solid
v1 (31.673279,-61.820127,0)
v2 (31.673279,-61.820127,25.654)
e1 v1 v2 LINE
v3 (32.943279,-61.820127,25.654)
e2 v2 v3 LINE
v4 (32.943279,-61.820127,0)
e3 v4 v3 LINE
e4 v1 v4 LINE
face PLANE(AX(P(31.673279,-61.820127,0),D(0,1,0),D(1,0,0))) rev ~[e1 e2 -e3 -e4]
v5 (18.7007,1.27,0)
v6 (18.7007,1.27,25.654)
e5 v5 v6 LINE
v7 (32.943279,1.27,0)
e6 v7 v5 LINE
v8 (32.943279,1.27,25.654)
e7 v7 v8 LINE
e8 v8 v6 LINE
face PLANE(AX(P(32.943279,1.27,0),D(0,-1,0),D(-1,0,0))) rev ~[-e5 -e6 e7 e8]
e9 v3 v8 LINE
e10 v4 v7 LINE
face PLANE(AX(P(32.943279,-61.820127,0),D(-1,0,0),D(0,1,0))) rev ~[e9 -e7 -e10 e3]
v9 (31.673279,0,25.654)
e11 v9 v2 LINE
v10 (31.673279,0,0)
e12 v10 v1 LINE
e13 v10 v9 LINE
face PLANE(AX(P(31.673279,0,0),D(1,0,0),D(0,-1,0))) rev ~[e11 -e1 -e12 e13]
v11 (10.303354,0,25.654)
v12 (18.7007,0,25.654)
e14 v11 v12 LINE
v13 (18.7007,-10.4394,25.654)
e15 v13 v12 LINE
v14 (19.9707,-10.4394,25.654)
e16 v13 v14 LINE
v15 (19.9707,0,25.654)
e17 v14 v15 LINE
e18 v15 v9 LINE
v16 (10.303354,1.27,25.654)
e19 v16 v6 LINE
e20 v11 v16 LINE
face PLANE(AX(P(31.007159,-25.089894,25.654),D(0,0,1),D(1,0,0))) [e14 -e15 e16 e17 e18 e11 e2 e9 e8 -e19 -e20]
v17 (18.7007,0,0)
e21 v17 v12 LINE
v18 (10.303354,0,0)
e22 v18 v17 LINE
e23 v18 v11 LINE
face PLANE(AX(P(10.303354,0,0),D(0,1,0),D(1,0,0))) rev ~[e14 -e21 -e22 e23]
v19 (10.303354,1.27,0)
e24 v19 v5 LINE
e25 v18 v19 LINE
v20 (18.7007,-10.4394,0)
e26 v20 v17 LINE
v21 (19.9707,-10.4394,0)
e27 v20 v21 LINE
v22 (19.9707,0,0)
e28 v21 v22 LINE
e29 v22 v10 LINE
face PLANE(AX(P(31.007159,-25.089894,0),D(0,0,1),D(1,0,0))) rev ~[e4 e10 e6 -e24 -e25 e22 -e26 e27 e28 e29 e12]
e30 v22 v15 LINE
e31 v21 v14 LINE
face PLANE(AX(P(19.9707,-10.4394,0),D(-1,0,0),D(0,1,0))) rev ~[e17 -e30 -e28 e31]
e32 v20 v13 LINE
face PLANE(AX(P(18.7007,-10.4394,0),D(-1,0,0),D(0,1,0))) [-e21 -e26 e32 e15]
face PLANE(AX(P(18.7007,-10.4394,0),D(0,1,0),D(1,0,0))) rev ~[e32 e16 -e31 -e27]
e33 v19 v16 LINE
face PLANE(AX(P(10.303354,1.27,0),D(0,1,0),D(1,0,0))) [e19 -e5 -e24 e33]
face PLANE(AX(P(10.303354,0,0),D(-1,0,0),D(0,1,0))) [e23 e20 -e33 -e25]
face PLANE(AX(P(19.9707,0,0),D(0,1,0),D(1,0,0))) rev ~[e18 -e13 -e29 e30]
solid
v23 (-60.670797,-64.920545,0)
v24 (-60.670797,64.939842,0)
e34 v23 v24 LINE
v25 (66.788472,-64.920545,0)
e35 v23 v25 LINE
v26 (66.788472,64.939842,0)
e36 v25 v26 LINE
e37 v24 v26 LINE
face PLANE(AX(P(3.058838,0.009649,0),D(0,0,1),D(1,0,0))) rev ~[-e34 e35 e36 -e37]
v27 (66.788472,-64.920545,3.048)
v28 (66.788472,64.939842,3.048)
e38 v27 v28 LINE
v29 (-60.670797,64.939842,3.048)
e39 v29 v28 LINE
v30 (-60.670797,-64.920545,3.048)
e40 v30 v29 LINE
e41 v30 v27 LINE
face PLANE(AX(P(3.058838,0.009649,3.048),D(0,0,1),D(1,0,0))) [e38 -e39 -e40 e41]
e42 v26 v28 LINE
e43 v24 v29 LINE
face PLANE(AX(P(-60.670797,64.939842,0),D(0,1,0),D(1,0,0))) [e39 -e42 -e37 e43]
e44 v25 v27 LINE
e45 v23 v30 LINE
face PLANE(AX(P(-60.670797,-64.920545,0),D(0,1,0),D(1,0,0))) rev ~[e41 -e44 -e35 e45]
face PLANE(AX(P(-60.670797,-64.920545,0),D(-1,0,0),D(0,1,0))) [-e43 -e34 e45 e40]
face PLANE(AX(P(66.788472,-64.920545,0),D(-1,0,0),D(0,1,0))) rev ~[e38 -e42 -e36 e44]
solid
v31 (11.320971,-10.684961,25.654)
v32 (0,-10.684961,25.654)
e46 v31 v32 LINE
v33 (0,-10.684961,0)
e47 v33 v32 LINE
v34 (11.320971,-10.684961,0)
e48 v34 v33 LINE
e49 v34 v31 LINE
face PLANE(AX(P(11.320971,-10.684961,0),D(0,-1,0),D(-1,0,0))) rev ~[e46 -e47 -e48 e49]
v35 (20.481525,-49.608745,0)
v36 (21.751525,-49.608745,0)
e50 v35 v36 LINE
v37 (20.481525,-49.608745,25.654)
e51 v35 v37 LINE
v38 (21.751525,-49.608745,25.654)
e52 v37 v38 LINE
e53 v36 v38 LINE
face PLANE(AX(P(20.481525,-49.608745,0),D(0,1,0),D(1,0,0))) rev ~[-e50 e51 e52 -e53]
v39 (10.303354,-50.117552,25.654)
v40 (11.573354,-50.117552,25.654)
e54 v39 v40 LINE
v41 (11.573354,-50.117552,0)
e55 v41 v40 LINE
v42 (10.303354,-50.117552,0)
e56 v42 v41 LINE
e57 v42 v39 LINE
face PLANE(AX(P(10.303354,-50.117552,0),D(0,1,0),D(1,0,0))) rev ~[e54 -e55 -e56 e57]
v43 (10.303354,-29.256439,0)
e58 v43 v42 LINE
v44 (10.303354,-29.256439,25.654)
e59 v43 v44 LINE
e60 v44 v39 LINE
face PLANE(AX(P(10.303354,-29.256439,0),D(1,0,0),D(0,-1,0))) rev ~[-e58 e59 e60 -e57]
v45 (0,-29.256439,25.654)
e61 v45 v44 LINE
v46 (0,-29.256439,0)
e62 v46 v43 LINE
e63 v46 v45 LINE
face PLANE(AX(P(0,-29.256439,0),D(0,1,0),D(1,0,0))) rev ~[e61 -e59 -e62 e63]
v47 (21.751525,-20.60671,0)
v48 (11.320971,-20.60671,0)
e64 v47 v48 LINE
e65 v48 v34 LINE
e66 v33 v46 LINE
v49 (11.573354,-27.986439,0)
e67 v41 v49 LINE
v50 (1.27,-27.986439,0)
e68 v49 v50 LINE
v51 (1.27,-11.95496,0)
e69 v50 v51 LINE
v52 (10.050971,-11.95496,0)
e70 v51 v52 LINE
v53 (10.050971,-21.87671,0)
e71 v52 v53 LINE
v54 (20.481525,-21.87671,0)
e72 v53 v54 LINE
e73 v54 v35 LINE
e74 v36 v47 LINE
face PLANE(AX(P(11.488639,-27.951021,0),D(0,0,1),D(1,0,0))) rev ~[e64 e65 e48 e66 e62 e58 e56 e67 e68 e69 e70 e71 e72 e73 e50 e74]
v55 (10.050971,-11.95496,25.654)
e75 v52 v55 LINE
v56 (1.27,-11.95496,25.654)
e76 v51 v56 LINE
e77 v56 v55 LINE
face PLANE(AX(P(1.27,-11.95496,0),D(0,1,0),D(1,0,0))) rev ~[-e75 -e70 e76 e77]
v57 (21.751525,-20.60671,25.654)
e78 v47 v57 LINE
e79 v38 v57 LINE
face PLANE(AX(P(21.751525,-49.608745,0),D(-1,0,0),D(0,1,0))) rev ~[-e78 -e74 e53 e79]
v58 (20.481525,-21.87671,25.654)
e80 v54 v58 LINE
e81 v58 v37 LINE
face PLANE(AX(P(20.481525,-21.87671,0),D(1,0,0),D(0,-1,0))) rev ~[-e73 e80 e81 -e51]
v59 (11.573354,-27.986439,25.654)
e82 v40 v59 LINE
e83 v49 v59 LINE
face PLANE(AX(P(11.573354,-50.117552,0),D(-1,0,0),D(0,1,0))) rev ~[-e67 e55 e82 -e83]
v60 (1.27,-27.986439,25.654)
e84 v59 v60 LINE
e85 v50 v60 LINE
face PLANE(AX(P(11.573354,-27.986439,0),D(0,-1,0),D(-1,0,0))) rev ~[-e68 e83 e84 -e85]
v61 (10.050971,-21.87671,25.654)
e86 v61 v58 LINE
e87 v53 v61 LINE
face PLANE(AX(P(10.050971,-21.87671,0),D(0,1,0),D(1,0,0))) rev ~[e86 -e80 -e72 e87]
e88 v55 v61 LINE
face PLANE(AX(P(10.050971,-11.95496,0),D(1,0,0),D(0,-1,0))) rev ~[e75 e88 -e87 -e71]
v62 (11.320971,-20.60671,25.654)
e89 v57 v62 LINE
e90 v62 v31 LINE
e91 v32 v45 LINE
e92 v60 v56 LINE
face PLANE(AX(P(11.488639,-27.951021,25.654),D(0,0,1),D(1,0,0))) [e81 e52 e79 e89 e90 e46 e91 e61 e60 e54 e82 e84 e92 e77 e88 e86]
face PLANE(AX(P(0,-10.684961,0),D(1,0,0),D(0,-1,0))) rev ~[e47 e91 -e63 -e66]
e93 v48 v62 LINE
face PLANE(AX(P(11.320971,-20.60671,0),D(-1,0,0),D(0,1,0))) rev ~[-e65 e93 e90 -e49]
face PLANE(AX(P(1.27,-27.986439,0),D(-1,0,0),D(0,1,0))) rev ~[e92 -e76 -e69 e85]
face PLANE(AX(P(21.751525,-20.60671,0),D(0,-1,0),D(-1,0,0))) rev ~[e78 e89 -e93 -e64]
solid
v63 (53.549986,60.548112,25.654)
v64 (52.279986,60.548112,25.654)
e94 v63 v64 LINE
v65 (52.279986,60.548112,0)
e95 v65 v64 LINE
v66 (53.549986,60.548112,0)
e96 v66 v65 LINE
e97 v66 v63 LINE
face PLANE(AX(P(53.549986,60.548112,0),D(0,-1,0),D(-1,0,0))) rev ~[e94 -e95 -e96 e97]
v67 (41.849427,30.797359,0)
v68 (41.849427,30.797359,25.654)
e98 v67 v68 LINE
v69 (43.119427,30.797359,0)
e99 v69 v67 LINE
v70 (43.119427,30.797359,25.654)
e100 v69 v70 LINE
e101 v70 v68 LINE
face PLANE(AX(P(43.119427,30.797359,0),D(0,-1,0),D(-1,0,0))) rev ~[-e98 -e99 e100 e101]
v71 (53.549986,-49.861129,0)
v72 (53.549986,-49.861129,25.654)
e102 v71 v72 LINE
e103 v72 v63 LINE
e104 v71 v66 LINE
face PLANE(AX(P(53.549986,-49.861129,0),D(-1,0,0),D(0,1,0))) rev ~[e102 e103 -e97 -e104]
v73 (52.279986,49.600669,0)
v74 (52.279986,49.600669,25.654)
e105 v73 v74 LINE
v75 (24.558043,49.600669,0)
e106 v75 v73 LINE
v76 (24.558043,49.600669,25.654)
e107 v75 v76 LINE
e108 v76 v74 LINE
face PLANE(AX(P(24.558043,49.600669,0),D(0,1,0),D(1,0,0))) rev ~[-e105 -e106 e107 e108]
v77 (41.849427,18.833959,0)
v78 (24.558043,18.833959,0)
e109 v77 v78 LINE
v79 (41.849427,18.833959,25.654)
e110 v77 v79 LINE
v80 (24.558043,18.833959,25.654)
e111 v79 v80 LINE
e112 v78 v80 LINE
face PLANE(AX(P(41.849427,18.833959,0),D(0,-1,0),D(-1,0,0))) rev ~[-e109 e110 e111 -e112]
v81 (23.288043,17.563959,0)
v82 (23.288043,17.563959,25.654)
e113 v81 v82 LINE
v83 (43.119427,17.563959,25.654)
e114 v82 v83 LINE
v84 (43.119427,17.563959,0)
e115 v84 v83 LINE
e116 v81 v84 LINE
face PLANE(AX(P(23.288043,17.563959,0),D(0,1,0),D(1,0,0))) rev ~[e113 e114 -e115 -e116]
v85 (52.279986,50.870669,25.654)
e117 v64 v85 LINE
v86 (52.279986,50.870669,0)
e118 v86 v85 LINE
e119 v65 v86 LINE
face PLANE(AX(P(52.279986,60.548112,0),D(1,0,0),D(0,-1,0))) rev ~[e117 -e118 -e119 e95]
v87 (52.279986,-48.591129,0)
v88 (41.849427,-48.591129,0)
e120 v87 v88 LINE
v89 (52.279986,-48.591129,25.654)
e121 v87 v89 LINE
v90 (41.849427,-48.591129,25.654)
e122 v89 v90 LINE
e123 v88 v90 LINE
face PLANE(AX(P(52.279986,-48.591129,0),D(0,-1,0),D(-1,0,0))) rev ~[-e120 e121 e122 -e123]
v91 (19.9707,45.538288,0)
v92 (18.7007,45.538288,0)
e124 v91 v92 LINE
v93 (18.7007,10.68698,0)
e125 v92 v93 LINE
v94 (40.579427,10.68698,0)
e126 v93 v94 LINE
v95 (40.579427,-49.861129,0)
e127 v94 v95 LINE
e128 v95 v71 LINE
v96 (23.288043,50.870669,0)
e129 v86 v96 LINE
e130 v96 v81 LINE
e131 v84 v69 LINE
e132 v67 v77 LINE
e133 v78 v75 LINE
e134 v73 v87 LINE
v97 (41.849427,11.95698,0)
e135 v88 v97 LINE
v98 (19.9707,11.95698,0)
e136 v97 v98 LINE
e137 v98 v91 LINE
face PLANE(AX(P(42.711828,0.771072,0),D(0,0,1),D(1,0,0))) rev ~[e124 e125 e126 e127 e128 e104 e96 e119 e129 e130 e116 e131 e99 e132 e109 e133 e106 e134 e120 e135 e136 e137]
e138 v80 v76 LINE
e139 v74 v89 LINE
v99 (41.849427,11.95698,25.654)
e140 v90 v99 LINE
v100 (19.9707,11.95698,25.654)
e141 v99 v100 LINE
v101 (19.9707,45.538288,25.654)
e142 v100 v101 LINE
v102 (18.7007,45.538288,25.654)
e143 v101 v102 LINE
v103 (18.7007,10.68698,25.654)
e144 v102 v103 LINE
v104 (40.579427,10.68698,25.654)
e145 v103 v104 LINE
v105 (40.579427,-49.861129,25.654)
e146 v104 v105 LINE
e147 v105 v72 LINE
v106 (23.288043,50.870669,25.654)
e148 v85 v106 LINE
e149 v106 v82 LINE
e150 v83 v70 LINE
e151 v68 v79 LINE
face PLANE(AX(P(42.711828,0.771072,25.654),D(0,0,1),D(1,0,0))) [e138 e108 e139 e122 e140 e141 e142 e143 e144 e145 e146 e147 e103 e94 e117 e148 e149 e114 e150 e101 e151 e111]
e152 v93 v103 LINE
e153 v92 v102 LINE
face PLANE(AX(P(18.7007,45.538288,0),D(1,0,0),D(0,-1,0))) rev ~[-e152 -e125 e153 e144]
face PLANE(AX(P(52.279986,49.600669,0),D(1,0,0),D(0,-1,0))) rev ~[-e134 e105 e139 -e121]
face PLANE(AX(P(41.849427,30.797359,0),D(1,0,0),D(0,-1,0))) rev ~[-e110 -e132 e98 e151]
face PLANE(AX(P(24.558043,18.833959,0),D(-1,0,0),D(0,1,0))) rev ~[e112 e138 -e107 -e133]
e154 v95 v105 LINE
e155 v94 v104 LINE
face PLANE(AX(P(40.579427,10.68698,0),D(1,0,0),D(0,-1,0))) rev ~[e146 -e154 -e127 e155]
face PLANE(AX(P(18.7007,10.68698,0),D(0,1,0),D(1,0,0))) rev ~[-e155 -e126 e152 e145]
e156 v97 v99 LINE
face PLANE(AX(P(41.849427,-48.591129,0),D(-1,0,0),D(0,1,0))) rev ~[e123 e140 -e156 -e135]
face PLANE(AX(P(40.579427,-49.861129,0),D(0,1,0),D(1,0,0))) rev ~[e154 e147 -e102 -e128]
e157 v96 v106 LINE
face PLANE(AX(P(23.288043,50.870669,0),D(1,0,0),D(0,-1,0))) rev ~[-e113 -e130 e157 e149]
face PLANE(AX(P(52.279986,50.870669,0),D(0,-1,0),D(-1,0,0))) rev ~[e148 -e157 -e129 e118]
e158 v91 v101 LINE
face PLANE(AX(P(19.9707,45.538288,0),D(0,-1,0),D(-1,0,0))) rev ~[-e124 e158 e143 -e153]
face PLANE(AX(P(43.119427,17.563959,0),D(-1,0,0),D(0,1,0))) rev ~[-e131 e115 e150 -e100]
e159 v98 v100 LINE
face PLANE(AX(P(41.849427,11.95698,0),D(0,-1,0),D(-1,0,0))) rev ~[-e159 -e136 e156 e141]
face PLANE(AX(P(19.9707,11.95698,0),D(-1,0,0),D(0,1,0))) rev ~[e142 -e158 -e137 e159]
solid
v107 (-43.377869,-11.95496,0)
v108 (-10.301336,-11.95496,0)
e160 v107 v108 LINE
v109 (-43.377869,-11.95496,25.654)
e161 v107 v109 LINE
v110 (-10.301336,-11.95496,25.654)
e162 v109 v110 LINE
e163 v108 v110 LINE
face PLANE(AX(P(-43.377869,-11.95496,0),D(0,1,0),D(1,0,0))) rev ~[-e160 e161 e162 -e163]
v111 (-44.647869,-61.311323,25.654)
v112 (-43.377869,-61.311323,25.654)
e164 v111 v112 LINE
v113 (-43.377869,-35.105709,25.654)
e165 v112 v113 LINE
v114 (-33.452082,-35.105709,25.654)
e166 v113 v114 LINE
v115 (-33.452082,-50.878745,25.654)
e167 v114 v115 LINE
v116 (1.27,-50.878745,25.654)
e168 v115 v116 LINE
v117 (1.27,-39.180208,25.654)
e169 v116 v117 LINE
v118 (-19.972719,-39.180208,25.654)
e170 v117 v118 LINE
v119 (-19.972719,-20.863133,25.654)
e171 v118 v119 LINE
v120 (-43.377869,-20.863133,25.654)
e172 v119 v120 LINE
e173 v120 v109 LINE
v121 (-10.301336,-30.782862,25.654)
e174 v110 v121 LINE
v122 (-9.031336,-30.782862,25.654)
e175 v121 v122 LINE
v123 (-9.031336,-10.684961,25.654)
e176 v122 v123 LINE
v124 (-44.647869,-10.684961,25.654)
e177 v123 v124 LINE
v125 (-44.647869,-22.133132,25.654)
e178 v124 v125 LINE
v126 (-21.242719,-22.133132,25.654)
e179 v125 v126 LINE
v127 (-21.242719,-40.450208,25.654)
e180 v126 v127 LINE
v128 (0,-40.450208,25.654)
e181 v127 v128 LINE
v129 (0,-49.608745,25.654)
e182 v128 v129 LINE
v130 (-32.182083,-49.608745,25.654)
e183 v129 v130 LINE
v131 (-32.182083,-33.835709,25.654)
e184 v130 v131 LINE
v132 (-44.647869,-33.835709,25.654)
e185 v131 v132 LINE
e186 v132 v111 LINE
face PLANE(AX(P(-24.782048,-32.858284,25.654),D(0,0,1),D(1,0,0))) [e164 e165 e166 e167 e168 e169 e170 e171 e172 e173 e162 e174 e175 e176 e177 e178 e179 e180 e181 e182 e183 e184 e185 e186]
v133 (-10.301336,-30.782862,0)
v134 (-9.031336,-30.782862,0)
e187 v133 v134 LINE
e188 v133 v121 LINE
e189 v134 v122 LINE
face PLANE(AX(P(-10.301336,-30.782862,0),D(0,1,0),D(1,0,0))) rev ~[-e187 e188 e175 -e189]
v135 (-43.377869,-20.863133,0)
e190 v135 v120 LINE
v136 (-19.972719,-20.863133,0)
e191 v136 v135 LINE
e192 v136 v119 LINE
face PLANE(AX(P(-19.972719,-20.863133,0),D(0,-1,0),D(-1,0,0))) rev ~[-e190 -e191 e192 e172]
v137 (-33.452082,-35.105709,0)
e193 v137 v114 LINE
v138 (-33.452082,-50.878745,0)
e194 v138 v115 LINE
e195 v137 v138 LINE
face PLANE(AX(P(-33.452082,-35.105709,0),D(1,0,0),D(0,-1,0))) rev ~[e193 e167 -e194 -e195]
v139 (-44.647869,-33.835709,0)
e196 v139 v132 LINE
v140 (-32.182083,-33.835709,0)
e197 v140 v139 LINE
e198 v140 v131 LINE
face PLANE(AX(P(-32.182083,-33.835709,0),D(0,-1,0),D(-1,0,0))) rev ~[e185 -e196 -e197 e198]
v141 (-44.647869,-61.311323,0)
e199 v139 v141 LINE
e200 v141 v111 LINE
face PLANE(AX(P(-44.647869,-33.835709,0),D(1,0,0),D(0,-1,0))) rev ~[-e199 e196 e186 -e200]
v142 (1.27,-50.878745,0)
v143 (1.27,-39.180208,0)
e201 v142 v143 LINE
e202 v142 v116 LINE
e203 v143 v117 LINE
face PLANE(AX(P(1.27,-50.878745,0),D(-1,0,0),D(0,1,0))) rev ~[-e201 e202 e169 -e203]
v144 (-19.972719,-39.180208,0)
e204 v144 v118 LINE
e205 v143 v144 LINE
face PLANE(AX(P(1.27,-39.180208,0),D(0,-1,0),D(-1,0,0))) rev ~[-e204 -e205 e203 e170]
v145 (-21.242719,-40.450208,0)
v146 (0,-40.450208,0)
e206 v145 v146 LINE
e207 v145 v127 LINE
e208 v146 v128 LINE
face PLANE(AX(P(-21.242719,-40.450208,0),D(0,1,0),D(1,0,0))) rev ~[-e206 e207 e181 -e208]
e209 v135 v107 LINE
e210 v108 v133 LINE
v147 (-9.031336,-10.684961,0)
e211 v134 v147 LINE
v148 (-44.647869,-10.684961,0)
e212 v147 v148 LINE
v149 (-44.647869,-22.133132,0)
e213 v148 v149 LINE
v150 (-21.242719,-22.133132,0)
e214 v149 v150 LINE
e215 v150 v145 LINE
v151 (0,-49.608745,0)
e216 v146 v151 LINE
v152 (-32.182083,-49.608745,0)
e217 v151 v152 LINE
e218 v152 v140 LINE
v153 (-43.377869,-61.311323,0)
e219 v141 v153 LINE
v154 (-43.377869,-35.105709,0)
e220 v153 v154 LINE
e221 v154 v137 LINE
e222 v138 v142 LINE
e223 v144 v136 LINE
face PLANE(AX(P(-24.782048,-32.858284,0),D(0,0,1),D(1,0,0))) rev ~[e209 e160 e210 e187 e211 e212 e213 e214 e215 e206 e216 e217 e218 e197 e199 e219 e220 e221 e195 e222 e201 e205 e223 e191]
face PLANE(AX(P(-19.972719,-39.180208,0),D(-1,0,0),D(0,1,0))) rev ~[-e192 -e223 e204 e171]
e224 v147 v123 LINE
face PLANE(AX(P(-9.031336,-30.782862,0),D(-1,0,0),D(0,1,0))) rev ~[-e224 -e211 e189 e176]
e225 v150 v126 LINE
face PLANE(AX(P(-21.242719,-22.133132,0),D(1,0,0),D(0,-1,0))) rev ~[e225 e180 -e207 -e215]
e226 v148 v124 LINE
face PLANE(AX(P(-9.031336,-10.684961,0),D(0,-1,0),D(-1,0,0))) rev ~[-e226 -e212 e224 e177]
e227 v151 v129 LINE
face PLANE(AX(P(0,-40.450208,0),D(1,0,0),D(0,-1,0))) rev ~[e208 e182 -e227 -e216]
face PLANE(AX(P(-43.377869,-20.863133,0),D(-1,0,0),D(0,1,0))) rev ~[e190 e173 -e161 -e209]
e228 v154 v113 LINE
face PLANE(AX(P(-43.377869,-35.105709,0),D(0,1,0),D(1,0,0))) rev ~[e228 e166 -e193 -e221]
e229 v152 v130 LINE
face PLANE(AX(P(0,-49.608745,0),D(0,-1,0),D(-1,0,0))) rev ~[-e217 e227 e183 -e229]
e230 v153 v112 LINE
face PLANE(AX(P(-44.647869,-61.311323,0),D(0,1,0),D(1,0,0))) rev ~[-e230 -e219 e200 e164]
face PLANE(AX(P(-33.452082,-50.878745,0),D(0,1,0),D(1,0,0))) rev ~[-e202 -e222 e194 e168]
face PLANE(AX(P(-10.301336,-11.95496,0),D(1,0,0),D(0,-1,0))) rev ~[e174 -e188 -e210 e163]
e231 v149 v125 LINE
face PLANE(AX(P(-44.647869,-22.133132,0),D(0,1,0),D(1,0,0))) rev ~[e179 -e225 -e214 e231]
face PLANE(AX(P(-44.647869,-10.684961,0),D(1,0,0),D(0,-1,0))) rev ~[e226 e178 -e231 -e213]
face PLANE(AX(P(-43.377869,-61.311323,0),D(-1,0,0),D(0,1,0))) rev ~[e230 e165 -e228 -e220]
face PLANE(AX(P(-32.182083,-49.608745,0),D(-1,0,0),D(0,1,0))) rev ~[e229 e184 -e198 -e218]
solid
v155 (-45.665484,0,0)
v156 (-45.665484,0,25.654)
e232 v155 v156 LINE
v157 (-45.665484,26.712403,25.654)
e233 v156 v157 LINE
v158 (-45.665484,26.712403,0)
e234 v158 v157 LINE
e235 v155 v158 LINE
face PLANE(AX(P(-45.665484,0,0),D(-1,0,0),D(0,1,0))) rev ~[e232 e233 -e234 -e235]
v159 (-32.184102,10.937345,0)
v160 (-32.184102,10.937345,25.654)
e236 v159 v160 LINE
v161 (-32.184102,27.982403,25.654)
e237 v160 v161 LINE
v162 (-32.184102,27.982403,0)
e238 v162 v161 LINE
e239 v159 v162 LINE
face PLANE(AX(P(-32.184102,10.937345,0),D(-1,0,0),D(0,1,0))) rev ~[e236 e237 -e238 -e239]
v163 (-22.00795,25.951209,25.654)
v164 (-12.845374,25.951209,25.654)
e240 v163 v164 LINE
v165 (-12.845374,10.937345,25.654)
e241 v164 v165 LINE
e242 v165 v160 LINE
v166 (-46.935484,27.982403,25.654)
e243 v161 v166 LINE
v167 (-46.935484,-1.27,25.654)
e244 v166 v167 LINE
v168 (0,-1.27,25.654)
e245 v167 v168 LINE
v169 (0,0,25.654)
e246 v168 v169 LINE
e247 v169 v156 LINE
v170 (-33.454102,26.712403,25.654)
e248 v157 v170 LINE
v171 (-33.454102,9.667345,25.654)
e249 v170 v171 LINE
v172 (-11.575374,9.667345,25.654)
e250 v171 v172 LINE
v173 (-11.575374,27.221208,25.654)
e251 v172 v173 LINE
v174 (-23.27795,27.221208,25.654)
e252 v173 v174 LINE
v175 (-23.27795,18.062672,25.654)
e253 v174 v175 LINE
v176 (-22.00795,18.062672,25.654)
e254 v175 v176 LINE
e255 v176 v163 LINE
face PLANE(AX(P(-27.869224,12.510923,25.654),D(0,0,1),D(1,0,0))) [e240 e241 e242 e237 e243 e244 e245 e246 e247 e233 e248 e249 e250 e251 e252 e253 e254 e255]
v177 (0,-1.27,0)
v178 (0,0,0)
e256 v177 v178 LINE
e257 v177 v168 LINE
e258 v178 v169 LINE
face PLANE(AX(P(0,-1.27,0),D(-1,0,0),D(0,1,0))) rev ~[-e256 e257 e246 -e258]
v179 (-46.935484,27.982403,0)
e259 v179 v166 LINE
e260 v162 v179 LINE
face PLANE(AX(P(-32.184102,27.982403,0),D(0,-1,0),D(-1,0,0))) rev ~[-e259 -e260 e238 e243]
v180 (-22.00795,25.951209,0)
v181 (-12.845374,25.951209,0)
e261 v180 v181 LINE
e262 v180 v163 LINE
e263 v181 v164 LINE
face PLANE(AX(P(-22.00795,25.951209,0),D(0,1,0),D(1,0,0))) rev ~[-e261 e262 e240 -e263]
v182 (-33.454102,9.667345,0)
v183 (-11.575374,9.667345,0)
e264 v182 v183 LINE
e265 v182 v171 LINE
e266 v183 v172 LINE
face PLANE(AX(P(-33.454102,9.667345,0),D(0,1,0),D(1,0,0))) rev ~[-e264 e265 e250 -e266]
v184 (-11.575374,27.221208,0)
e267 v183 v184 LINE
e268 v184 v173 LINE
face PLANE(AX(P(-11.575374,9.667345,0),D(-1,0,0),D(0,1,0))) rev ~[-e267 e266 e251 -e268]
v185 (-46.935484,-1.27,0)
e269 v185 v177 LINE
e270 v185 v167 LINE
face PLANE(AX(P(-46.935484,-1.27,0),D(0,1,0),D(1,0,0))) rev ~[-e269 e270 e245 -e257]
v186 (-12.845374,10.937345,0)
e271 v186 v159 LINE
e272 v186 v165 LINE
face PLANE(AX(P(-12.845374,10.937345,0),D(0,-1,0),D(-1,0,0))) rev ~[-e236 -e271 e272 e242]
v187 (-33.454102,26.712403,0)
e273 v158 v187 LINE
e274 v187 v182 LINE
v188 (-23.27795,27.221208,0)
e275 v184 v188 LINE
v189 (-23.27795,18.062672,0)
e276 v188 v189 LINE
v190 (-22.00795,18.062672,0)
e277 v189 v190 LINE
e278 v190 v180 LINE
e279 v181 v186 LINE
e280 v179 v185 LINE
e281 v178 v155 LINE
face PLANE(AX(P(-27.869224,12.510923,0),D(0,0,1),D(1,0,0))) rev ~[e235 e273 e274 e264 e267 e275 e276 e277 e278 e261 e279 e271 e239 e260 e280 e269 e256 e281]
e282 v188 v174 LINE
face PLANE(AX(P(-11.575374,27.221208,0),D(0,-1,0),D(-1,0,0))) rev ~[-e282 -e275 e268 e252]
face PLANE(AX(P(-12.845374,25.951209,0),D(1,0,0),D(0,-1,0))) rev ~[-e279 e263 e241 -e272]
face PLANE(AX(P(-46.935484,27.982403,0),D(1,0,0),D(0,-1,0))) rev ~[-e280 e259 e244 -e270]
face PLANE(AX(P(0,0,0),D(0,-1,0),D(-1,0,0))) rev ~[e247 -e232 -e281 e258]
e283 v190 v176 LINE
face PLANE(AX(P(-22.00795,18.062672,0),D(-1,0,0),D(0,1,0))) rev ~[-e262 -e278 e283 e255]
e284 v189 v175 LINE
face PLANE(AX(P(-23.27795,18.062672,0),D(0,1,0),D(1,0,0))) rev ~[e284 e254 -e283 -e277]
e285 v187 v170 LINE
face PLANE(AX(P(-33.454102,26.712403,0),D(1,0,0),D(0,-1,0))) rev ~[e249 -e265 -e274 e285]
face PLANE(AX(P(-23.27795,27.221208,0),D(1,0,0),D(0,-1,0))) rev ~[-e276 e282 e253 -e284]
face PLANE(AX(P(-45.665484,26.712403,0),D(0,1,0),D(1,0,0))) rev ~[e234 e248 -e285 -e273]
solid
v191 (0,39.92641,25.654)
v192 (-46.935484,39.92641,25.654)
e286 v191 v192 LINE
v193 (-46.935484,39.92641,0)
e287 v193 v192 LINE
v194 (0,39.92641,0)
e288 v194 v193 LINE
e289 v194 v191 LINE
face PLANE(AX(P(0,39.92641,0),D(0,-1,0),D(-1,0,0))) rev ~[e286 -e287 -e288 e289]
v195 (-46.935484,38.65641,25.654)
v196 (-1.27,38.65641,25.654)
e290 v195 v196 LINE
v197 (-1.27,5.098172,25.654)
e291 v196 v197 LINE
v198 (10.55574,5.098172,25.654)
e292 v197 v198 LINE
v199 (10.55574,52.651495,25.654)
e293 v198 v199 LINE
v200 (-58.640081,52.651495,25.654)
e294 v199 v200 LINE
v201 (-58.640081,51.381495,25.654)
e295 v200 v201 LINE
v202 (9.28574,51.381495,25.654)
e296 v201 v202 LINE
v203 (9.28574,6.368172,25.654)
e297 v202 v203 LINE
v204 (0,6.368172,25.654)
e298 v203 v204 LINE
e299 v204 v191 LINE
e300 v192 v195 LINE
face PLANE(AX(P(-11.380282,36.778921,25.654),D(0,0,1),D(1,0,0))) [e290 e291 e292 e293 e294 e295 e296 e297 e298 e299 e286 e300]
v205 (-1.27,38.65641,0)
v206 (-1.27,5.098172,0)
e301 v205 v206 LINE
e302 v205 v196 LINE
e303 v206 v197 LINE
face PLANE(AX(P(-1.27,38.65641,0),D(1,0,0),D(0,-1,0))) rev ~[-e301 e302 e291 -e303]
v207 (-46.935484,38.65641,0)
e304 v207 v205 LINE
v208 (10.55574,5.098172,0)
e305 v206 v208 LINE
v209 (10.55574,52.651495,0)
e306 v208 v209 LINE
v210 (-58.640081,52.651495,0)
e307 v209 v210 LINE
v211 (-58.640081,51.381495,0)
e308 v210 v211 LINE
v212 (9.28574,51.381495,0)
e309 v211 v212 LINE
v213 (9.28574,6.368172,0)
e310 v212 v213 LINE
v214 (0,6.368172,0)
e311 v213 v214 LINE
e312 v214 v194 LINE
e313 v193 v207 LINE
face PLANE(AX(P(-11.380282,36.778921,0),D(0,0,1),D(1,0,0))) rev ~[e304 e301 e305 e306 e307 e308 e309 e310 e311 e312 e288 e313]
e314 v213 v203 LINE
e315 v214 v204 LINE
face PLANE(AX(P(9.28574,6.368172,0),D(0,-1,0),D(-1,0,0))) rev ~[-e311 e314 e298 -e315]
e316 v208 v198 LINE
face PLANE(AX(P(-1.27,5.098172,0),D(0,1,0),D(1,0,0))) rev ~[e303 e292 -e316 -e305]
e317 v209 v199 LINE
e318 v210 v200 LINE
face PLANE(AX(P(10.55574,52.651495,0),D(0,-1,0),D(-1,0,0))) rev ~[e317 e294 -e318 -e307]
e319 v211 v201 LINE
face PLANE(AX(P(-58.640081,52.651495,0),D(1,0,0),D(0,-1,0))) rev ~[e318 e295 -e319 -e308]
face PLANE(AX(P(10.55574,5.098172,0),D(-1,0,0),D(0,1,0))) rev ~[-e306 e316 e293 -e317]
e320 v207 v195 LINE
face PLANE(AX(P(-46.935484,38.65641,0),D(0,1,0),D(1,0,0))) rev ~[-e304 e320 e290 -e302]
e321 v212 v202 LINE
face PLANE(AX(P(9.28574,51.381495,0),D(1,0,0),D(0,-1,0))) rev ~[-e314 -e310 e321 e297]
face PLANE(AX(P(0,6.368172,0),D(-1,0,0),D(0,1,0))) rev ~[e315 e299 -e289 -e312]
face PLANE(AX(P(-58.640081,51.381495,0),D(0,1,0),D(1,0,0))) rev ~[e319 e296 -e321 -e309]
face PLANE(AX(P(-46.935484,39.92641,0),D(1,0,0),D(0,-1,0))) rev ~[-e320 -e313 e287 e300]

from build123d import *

# Parameters (mm, degrees)
F1_DEPTH = 25.654
F0_W     = 1.2699998915
F0_H     = 10.4394
F0_W_2   = 8.3973463625
F0_H_2   = 1.27
F2_W     = 127.459269017
F2_H     = 129.8603862524
F3_DEPTH = 3.048


# Not quite as in the source:
# - ends of sketch curves that miss each other by under 0.0002 mm in the source are joined
# - the program builds the solid bodies; features that only make, move or delete a surface that nothing else refers to are left out


with BuildPart() as f1:
    # F0 (on Top) → F1 (new body)
    with BuildSketch(Plane.XY):
        Polygon((-44.6478687227, -33.835709095), (-44.6478687227, -61.3113231957), (-43.3778688312, -61.3113231957), (-43.3778688312, -35.1057089865), (-33.4520824254, -35.1057089865), (-33.4520824254, -50.8787445724), (1.2699998915, -50.8787445724), (1.2699998915, -39.1802079976), (-19.9727192521, -39.1802079976), (-19.9727192521, -20.8631325513), (-43.3778688312, -20.8631325513), (-43.3778688312, -11.9549604133), (-10.3013357148, -11.9549604133), (-10.3013357148, -30.7828616351), (-9.0313358232, -30.7828616351), (-9.0313358232, -10.6849605218), (-44.6478687227, -10.6849605218), (-44.6478687227, -22.1331324428), (-21.2427191436, -22.1331324428), (-21.2427191436, -40.4502078891), (0, -40.4502078891), (0, -49.6087446809), (-32.1820825338, -49.6087446809), (-32.1820825338, -33.835709095), align=None)
    extrude(amount=F1_DEPTH)


with BuildPart() as f1b:
    # F0 (on Top) → F1, piece 2 (new body)
    with BuildSketch(Plane.XY):
        Polygon((0, -1.2699998915), (0, 0), (-45.6654839218, 0), (-45.6654839218, 26.7124027014), (-33.4541015327, 26.7124027014), (-33.4541015327, 9.6673453227), (-11.575373821, 9.6673453227), (-11.575373821, 27.2212084383), (-23.2779495418, 27.2212084383), (-23.2779495418, 18.0626716465), (-22.0079496503, 18.0626716465), (-22.0079496503, 25.9512085468), (-12.8453737125, 25.9512085468), (-12.8453737125, 10.9373452142), (-32.1841016412, 10.9373452142), (-32.1841016412, 27.9824025929), (-46.9354838133, 27.9824025929), (-46.9354838133, -1.2699998915), align=None)
    extrude(amount=F1_DEPTH)


with BuildPart() as f1c:
    # F0 (on Top) → F1, piece 3 (new body)
    with BuildSketch(Plane.XY):
        Polygon((0, 6.3681719211), (0, 39.9264097214), (-46.9354838133, 39.9264097214), (-46.9354838133, 38.6564097214), (-1.27, 38.6564097214), (-1.27, 5.0981719211), (10.555739623, 5.0981719211), (10.555739623, 52.6514952838), (-46.670460377, 52.6514952838), (-58.6400814354, 52.6514952838), (-58.6400814354, 52.2722989818), (-58.6400814354, 51.3814952838), (-46.670460377, 51.3814952838), (9.285739623, 51.3814952838), (9.285739623, 6.3681719211), align=None)
    extrude(amount=F1_DEPTH)


with BuildPart() as f1d:
    # F0 (on Top) → F1, piece 4 (new body)
    with BuildSketch(Plane.XY):
        Polygon((31.6732786596, -10.4394), (31.6732786596, -49.6087446809), (31.6732786596, -61.82012707), (32.9432785511, -61.82012707), (32.9432785511, -49.6087446809), (32.9432785511, -10.4394), (32.9432785511, 1.2699998915), (19.9707001448, 1.2699998915), (18.7007002532, 1.2699998915), (18.7007002532, 0), (19.9707001448, 0), (31.6732786596, 0), align=None)
        with Locations((19.335700199, -5.2197)):
            Rectangle(F0_W, F0_H)
        with Locations((14.502027072, 0.635)):
            Rectangle(F0_W_2, F0_H_2)
    extrude(amount=F1_DEPTH)


with BuildPart() as f1e:
    # F0 (on Top) → F1, piece 5 (new body)
    with BuildSketch(Plane.XY):
        Polygon((10.3033538908, -29.2564388365), (10.3033538908, -50.1175522804), (11.5733537823, -50.1175522804), (11.5733537823, -27.9864389449), (1.2699998915, -27.9864389449), (1.2699998915, -11.9549604133), (10.050971061, -11.9549604133), (10.050971061, -21.8767095357), (20.481524989, -21.8767095357), (20.481524989, -49.6087446809), (21.7515248805, -49.6087446809), (21.7515248805, -20.6067096442), (11.3209709525, -20.6067096442), (11.3209709525, -10.6849605218), (0, -10.6849605218), (0, -29.2564388365), align=None)
    extrude(amount=F1_DEPTH)


with BuildPart() as f1f:
    # F0 (on Top) → F1, piece 6 (new body)
    with BuildSketch(Plane.XY):
        Polygon((19.9707001448, 11.9569795206), (19.9707001448, 45.5382876098), (18.7007002532, 45.5382876098), (18.7007002532, 10.6869796291), (40.5794270337, 10.6869796291), (40.5794270337, -49.8611293733), (53.5499863327, -49.8611293733), (53.5499863327, 44.5206686854), (53.5499863327, 60.5481117964), (52.2799864411, 60.5481117964), (52.2799864411, 50.8706686854), (52.2799864411, 49.6006686854), (52.2799864411, -48.5911294818), (41.8494269252, -48.5911294818), (41.8494269252, 11.9569795206), align=None)
        Polygon((24.5580426735, 49.6006686854), (52.2799864411, 49.6006686854), (52.2799864411, 50.8706686854), (23.2880426735, 50.8706686854), (23.2880426735, 17.5639590412), (43.1194269252, 17.5639590412), (43.1194269252, 30.7973590412), (41.8494269252, 30.7973590412), (41.8494269252, 18.8339590412), (24.5580426735, 18.8339590412), align=None)
    extrude(amount=F1_DEPTH)


with BuildPart() as f3:
    # F2 (on Top) → F3 (new body)
    with BuildSketch(Plane.XY):
        with Locations((3.0588377267, 0.0096485019)):
            Rectangle(F2_W, F2_H)
    extrude(amount=F3_DEPTH)


solid = Compound([f1.part, f1b.part, f1c.part, f1d.part, f1e.part, f1f.part, f3.part])
